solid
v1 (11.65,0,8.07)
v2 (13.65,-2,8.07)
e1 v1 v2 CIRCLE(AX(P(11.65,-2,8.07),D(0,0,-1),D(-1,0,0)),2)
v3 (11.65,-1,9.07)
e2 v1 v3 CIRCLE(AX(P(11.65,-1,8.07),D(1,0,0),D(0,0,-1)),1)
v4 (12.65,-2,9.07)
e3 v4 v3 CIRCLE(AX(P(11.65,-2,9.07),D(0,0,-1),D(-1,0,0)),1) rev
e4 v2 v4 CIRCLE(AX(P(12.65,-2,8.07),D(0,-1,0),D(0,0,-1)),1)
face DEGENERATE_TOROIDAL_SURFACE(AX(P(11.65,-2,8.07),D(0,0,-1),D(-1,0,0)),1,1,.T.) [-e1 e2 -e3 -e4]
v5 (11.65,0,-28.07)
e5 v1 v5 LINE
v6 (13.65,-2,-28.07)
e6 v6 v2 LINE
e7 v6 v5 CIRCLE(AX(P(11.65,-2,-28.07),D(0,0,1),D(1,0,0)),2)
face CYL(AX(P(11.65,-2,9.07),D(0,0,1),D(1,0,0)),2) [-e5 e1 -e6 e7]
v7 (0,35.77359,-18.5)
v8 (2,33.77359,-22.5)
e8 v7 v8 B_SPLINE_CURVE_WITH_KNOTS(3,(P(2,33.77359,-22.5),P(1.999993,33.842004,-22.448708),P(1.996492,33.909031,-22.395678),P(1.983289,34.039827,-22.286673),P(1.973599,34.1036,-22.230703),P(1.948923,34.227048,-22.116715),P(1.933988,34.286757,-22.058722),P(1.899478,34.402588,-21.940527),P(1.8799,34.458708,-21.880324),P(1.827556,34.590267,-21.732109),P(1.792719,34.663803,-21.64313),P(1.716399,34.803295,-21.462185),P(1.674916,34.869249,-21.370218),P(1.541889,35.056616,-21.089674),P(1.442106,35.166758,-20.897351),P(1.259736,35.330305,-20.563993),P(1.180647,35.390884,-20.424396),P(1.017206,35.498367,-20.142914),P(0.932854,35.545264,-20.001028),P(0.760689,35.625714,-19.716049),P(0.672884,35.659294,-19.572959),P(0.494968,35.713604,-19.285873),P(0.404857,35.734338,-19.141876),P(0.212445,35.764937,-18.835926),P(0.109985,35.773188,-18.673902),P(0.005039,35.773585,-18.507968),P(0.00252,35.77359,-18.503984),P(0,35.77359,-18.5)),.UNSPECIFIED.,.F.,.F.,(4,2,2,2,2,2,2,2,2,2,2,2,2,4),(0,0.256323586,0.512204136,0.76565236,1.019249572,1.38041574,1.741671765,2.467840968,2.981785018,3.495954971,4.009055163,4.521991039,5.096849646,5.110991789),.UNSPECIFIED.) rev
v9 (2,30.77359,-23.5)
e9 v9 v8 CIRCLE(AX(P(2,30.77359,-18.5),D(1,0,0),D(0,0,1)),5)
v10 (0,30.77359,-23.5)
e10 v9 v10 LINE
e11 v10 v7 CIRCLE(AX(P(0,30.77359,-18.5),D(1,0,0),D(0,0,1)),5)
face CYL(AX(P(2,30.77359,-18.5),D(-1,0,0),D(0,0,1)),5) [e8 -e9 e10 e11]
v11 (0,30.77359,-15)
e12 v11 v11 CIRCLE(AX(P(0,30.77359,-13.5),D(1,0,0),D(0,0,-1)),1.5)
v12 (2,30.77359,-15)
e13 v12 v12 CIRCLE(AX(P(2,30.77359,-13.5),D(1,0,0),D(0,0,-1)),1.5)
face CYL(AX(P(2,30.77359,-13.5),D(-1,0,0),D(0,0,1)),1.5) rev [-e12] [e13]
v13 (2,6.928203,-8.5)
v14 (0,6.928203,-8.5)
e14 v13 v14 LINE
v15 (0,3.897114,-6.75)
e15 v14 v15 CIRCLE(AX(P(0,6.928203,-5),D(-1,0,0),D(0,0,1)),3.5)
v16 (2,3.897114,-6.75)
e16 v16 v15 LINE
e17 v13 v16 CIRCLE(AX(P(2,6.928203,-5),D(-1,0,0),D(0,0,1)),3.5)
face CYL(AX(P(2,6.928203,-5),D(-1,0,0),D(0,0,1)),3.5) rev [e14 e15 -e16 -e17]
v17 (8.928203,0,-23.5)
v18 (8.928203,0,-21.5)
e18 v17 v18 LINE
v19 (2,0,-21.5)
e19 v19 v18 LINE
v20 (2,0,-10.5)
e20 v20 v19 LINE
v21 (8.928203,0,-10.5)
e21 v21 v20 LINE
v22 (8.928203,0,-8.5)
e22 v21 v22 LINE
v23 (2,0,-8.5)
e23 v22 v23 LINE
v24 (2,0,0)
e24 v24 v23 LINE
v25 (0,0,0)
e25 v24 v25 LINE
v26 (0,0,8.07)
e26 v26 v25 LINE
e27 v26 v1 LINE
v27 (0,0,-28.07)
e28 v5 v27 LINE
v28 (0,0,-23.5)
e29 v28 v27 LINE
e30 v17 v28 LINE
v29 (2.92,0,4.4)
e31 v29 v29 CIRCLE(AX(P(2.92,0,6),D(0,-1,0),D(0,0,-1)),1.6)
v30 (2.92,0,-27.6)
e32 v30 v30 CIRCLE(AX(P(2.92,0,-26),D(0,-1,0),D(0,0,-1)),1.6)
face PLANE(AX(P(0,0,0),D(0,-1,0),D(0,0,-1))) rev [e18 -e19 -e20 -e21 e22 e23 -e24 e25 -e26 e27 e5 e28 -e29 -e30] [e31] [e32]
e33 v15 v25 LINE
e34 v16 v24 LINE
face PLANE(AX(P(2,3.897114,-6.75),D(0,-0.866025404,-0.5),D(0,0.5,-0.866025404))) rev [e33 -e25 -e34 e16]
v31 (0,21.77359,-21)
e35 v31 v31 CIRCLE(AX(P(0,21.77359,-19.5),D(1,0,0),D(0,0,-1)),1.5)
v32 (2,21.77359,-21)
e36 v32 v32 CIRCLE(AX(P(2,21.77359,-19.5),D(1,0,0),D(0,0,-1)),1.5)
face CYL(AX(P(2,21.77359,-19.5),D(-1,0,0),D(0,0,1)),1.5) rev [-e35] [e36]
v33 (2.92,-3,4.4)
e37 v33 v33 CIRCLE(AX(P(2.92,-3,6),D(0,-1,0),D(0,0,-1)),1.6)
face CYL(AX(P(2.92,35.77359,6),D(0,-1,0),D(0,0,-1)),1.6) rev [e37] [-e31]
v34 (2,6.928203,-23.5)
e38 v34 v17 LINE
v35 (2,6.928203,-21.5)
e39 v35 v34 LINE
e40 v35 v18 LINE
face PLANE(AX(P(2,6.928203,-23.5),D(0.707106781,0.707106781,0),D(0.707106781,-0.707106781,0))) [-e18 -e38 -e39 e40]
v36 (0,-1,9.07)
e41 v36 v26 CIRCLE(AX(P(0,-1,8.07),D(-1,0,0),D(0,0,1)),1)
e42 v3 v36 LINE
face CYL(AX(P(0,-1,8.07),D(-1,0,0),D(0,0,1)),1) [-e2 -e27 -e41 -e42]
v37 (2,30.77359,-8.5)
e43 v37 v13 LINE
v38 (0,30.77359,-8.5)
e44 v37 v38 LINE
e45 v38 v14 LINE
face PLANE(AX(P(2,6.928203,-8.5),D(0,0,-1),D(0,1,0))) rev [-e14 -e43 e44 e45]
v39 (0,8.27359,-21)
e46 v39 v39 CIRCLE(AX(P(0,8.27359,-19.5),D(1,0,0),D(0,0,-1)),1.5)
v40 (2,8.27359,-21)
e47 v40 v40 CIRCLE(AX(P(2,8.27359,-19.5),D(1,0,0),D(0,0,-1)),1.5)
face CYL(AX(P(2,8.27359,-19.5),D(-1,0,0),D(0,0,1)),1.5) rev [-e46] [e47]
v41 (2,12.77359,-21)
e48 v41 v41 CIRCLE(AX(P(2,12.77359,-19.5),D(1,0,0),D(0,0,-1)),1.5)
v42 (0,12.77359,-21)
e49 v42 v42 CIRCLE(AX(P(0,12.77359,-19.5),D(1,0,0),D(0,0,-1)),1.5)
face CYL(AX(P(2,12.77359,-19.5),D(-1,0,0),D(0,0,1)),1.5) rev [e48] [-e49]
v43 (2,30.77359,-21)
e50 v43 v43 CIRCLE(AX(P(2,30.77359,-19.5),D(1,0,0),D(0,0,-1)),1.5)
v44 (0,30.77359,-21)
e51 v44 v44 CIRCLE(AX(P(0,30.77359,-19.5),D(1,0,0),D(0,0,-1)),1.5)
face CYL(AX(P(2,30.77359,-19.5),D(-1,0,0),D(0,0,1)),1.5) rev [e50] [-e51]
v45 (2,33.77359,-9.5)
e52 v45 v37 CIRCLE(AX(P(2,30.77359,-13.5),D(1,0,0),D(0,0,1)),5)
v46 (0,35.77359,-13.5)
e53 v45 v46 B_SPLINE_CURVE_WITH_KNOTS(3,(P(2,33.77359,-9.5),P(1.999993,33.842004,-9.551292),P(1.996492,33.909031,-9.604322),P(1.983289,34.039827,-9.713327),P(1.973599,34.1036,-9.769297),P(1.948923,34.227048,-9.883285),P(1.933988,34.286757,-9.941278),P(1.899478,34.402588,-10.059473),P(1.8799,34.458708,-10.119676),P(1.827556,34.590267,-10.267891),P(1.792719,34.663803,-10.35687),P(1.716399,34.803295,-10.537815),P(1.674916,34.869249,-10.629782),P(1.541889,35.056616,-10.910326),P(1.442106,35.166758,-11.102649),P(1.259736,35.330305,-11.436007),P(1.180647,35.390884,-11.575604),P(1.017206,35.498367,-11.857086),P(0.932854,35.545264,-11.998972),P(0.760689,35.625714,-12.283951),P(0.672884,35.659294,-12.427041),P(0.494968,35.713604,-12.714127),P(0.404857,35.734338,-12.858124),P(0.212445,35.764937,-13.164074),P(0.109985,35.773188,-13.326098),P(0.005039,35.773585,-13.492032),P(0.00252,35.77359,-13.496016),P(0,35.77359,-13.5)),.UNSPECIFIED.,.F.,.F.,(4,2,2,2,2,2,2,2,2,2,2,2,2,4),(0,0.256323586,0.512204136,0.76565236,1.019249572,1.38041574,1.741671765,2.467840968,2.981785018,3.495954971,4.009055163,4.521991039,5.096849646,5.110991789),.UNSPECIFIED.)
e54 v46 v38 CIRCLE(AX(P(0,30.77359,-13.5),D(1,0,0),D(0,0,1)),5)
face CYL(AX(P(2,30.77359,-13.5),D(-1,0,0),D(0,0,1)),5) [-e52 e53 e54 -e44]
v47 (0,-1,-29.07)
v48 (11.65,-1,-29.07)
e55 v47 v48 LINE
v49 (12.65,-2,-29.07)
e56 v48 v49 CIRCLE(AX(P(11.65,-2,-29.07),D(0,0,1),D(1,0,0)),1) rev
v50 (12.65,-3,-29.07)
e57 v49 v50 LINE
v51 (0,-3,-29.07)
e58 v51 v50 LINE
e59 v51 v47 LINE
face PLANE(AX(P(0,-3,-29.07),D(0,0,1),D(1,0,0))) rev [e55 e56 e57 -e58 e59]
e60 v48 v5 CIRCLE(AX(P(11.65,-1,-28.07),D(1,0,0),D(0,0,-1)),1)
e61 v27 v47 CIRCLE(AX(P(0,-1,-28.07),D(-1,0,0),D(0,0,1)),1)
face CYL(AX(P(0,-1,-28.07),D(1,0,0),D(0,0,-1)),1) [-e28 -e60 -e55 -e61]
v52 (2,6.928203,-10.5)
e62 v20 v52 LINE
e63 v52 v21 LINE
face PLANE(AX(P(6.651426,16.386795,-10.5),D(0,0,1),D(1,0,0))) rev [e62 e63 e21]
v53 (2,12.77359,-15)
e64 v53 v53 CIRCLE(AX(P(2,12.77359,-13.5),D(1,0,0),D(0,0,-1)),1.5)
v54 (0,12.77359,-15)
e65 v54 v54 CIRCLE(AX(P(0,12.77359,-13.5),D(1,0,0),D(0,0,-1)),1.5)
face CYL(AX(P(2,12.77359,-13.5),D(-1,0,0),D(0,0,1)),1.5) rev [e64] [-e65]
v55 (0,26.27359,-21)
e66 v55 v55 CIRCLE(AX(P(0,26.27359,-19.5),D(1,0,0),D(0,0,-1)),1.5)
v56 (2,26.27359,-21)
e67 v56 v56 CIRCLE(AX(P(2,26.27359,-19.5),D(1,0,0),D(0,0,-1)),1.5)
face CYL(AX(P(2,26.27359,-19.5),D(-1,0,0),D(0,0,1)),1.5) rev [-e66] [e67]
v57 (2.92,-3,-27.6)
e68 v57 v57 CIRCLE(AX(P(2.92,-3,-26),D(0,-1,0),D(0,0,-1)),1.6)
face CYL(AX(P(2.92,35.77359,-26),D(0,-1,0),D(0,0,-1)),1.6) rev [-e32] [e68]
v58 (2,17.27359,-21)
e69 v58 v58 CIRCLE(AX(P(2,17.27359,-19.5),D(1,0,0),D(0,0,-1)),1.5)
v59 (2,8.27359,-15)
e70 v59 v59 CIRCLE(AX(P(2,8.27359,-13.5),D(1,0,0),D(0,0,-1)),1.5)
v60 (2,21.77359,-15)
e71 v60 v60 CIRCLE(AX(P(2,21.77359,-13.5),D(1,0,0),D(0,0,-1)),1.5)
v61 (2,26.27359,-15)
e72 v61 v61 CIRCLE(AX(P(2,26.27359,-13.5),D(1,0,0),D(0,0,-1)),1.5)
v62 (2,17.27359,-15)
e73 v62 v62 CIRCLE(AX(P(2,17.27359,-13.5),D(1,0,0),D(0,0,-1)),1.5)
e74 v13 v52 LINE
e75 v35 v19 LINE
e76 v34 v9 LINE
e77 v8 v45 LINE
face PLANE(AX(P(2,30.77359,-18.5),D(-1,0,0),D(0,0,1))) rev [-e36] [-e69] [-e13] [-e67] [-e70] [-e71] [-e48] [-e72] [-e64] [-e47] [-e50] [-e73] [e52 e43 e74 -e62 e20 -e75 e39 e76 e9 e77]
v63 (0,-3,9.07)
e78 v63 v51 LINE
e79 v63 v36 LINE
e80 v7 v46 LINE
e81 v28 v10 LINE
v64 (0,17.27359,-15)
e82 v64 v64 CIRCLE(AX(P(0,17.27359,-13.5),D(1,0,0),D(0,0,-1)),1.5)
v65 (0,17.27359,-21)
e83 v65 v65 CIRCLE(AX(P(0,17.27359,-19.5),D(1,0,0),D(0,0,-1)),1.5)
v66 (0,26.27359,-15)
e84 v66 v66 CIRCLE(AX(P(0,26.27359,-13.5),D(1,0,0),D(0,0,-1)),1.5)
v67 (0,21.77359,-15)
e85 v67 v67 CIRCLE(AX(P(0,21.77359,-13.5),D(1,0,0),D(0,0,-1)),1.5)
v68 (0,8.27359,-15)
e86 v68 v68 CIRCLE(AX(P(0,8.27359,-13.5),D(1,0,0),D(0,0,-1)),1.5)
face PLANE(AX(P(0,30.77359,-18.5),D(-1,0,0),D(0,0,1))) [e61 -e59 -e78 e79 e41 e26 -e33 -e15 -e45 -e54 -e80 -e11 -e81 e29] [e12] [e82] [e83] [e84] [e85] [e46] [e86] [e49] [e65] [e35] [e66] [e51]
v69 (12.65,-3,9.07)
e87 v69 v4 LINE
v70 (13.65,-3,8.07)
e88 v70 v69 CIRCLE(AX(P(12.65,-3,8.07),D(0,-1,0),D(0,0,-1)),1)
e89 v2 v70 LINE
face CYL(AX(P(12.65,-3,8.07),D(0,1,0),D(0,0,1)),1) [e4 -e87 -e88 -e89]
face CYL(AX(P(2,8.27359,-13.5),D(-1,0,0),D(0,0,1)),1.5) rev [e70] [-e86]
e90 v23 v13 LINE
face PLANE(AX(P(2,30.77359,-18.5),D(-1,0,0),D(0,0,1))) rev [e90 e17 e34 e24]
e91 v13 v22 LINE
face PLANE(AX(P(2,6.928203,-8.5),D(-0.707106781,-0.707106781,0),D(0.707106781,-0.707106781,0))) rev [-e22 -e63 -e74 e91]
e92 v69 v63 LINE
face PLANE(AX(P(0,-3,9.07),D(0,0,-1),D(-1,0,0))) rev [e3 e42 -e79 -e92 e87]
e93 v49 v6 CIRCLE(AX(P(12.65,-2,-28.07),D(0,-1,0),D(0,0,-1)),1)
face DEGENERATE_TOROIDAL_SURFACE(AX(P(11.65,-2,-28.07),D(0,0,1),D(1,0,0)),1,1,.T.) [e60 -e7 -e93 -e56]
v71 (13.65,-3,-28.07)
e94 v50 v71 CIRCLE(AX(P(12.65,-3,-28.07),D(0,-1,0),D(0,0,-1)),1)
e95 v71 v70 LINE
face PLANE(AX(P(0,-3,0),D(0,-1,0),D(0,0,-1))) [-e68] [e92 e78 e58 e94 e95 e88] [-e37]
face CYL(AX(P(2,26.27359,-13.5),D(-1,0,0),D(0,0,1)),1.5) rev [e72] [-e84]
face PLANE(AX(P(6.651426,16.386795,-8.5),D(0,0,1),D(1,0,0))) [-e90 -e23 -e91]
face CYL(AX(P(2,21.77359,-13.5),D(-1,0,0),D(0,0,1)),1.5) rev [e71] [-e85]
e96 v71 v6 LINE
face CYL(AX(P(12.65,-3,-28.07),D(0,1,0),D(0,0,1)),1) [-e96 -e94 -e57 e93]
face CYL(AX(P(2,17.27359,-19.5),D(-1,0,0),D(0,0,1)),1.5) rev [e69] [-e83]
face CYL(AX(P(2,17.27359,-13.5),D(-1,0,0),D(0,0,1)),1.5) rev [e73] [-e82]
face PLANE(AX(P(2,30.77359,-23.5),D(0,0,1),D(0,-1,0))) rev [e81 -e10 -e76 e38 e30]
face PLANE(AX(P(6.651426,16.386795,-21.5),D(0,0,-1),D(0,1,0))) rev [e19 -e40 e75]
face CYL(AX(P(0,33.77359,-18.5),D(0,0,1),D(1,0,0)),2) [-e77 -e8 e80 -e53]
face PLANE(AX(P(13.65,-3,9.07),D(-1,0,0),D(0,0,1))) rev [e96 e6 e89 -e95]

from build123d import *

# Parameters (mm, degrees)
SKETCH_1_R          = 1.5
EXTRUDE_1_DEPTH     = 2
FILLET_1_R          = 2
SKETCH_2_W          = 13.65
SKETCH_2_H          = 38.14
EXTRUDE_2_DEPTH     = 3
SKETCH_5_R          = 1.6
CUT_EXTRUDE_1_DEPTH = 51.34658541
FILLET_5_R          = 2
FILLET_6_R          = 1
RIB_5_REACH         = 45.465
SKETCH_6_WALL_W     = 98.727749582
SKETCH_6_WALL_H     = 2
RIB_8_REACH         = 52.268
SKETCH_8_WALL_W     = 112.334064404
SKETCH_8_WALL_H     = 2


with BuildPart() as part:
    # 草图1 → 凸台-拉伸1 (new body)
    with BuildSketch(Plane(origin=(0, 0, 0), x_dir=(0, 0, -1), z_dir=(1, 0, 0))):
        with BuildLine():
            Line((8.5, 6.92820323), (8.5, 30.773589654))
            ThreePointArc((8.5, 30.773589654), (9.964466094, 34.30912356), (13.5, 35.773589654))
            Line((13.5, 35.773589654), (18.5, 35.773589654))
            ThreePointArc((18.5, 35.773589654), (22.035533906, 34.30912356), (23.5, 30.773589654))
            Line((23.5, 30.773589654), (23.5, 0))
            Line((23.5, 0), (0, 0))
            Line((0, 0), (6.75, 3.897114317))
            ThreePointArc((6.75, 3.897114317), (8.031088913, 5.17820323), (8.5, 6.92820323))
        make_face()
        with Locations((19.5, 30.773589654)):
            Circle(SKETCH_1_R, mode=Mode.SUBTRACT)
        with Locations((13.5, 30.773589654)):
            Circle(SKETCH_1_R, mode=Mode.SUBTRACT)
        with Locations((19.5, 26.273589654)):
            Circle(SKETCH_1_R, mode=Mode.SUBTRACT)
        with Locations((13.5, 26.273589654)):
            Circle(SKETCH_1_R, mode=Mode.SUBTRACT)
        with Locations((19.5, 21.773589654)):
            Circle(SKETCH_1_R, mode=Mode.SUBTRACT)
        with Locations((13.5, 21.773589654)):
            Circle(SKETCH_1_R, mode=Mode.SUBTRACT)
        with Locations((19.5, 17.273589654)):
            Circle(SKETCH_1_R, mode=Mode.SUBTRACT)
        with Locations((13.5, 17.273589654)):
            Circle(SKETCH_1_R, mode=Mode.SUBTRACT)
        with Locations((19.5, 12.773589654)):
            Circle(SKETCH_1_R, mode=Mode.SUBTRACT)
        with Locations((13.5, 12.773589654)):
            Circle(SKETCH_1_R, mode=Mode.SUBTRACT)
        with Locations((19.5, 8.273589654)):
            Circle(SKETCH_1_R, mode=Mode.SUBTRACT)
        with Locations((13.5, 8.273589654)):
            Circle(SKETCH_1_R, mode=Mode.SUBTRACT)
    extrude(amount=EXTRUDE_1_DEPTH)

    # 圆角1
    # the kernel refuses this fillet: 2 mm, written as the material it takes off along each edge
    with BuildSketch(Plane(origin=(2, 35.773589654, -8.5), x_dir=(-1, 0, 0), z_dir=(0, 0, -1))) as fillet_1_piece_1:
        with BuildLine():
            CenterArc((FILLET_1_R, -FILLET_1_R), FILLET_1_R, 90, 90)
            Line((0, -FILLET_1_R), (0, 0))
            Line((0, 0), (FILLET_1_R, 0))
        make_face()
    extrude(amount=15, mode=Mode.SUBTRACT)

    # 草图2 → 凸台-拉伸2 (add)
    with BuildSketch(Plane.XZ):
        with Locations((6.825, -10)):
            Rectangle(SKETCH_2_W, SKETCH_2_H)
    extrude(amount=EXTRUDE_2_DEPTH)

    # 草图5 → 切除-拉伸1 (cut, through all)
    with BuildSketch(Plane.XZ.offset(3)):
        with Locations(Location((2.92, 6, 0), (0, 0, 270))):
            Circle(SKETCH_5_R)
        with Locations(Location((2.92, -26, 0), (0, 0, 270))):
            Circle(SKETCH_5_R)
    extrude(amount=-CUT_EXTRUDE_1_DEPTH, mode=Mode.SUBTRACT)

    # 圆角5
    fillet_5_edges = [part.edges().sort_by_distance(p)[0] for p in [
        (13.65, 0, -10),
    ]]
    fillet(fillet_5_edges, radius=FILLET_5_R)

    # 圆角6
    fillet_6_edges = [part.edges().sort_by_distance(p)[0] for p in [
        (5.825, 0, 9.07),
        (13.064213562, -0.585786438, 9.07),
        (13.064213562, -0.585786438, -29.07),
        (5.825, 0, -29.07),
        (13.65, -2.5, -29.07),
        (13.65, -2.5, 9.07),
    ]]
    fillet(fillet_6_edges, radius=FILLET_6_R)

    # 草图6 wall → 筋5 (add, up to next)
    with BuildSketch(Plane(origin=(5.464101615, 3.464101615, -8.5), x_dir=(0.707106781187, -0.707106781187, 0), z_dir=(0.707106781187, 0.707106781187, 0)), mode=Mode.PRIVATE) as rib_5_sk1:
        with Locations((0, 1)):
            Rectangle(SKETCH_6_WALL_W, SKETCH_6_WALL_H)
    rib_5_tool1 = extrude(rib_5_sk1.sketch, amount=-RIB_5_REACH, mode=Mode.PRIVATE) - part.part
    add(rib_5_tool1.solids().sort_by_distance((5.464101615, 3.464101615, -8.5))[0])

    # 草图8 wall → 筋8 (add, up to next)
    with BuildSketch(Plane(origin=(5.464101615, 3.464101615, -23.5), x_dir=(0.707106781187, -0.707106781187, 0), z_dir=(-0.707106781187, -0.707106781187, 0)), mode=Mode.PRIVATE) as rib_8_sk1:
        with Locations((0, 1)):
            Rectangle(SKETCH_8_WALL_W, SKETCH_8_WALL_H)
    rib_8_tool1 = extrude(rib_8_sk1.sketch, amount=RIB_8_REACH, mode=Mode.PRIVATE) - part.part
    add(rib_8_tool1.solids().sort_by_distance((5.464101615, 3.464101615, -23.5))[0])


solid = part.part
